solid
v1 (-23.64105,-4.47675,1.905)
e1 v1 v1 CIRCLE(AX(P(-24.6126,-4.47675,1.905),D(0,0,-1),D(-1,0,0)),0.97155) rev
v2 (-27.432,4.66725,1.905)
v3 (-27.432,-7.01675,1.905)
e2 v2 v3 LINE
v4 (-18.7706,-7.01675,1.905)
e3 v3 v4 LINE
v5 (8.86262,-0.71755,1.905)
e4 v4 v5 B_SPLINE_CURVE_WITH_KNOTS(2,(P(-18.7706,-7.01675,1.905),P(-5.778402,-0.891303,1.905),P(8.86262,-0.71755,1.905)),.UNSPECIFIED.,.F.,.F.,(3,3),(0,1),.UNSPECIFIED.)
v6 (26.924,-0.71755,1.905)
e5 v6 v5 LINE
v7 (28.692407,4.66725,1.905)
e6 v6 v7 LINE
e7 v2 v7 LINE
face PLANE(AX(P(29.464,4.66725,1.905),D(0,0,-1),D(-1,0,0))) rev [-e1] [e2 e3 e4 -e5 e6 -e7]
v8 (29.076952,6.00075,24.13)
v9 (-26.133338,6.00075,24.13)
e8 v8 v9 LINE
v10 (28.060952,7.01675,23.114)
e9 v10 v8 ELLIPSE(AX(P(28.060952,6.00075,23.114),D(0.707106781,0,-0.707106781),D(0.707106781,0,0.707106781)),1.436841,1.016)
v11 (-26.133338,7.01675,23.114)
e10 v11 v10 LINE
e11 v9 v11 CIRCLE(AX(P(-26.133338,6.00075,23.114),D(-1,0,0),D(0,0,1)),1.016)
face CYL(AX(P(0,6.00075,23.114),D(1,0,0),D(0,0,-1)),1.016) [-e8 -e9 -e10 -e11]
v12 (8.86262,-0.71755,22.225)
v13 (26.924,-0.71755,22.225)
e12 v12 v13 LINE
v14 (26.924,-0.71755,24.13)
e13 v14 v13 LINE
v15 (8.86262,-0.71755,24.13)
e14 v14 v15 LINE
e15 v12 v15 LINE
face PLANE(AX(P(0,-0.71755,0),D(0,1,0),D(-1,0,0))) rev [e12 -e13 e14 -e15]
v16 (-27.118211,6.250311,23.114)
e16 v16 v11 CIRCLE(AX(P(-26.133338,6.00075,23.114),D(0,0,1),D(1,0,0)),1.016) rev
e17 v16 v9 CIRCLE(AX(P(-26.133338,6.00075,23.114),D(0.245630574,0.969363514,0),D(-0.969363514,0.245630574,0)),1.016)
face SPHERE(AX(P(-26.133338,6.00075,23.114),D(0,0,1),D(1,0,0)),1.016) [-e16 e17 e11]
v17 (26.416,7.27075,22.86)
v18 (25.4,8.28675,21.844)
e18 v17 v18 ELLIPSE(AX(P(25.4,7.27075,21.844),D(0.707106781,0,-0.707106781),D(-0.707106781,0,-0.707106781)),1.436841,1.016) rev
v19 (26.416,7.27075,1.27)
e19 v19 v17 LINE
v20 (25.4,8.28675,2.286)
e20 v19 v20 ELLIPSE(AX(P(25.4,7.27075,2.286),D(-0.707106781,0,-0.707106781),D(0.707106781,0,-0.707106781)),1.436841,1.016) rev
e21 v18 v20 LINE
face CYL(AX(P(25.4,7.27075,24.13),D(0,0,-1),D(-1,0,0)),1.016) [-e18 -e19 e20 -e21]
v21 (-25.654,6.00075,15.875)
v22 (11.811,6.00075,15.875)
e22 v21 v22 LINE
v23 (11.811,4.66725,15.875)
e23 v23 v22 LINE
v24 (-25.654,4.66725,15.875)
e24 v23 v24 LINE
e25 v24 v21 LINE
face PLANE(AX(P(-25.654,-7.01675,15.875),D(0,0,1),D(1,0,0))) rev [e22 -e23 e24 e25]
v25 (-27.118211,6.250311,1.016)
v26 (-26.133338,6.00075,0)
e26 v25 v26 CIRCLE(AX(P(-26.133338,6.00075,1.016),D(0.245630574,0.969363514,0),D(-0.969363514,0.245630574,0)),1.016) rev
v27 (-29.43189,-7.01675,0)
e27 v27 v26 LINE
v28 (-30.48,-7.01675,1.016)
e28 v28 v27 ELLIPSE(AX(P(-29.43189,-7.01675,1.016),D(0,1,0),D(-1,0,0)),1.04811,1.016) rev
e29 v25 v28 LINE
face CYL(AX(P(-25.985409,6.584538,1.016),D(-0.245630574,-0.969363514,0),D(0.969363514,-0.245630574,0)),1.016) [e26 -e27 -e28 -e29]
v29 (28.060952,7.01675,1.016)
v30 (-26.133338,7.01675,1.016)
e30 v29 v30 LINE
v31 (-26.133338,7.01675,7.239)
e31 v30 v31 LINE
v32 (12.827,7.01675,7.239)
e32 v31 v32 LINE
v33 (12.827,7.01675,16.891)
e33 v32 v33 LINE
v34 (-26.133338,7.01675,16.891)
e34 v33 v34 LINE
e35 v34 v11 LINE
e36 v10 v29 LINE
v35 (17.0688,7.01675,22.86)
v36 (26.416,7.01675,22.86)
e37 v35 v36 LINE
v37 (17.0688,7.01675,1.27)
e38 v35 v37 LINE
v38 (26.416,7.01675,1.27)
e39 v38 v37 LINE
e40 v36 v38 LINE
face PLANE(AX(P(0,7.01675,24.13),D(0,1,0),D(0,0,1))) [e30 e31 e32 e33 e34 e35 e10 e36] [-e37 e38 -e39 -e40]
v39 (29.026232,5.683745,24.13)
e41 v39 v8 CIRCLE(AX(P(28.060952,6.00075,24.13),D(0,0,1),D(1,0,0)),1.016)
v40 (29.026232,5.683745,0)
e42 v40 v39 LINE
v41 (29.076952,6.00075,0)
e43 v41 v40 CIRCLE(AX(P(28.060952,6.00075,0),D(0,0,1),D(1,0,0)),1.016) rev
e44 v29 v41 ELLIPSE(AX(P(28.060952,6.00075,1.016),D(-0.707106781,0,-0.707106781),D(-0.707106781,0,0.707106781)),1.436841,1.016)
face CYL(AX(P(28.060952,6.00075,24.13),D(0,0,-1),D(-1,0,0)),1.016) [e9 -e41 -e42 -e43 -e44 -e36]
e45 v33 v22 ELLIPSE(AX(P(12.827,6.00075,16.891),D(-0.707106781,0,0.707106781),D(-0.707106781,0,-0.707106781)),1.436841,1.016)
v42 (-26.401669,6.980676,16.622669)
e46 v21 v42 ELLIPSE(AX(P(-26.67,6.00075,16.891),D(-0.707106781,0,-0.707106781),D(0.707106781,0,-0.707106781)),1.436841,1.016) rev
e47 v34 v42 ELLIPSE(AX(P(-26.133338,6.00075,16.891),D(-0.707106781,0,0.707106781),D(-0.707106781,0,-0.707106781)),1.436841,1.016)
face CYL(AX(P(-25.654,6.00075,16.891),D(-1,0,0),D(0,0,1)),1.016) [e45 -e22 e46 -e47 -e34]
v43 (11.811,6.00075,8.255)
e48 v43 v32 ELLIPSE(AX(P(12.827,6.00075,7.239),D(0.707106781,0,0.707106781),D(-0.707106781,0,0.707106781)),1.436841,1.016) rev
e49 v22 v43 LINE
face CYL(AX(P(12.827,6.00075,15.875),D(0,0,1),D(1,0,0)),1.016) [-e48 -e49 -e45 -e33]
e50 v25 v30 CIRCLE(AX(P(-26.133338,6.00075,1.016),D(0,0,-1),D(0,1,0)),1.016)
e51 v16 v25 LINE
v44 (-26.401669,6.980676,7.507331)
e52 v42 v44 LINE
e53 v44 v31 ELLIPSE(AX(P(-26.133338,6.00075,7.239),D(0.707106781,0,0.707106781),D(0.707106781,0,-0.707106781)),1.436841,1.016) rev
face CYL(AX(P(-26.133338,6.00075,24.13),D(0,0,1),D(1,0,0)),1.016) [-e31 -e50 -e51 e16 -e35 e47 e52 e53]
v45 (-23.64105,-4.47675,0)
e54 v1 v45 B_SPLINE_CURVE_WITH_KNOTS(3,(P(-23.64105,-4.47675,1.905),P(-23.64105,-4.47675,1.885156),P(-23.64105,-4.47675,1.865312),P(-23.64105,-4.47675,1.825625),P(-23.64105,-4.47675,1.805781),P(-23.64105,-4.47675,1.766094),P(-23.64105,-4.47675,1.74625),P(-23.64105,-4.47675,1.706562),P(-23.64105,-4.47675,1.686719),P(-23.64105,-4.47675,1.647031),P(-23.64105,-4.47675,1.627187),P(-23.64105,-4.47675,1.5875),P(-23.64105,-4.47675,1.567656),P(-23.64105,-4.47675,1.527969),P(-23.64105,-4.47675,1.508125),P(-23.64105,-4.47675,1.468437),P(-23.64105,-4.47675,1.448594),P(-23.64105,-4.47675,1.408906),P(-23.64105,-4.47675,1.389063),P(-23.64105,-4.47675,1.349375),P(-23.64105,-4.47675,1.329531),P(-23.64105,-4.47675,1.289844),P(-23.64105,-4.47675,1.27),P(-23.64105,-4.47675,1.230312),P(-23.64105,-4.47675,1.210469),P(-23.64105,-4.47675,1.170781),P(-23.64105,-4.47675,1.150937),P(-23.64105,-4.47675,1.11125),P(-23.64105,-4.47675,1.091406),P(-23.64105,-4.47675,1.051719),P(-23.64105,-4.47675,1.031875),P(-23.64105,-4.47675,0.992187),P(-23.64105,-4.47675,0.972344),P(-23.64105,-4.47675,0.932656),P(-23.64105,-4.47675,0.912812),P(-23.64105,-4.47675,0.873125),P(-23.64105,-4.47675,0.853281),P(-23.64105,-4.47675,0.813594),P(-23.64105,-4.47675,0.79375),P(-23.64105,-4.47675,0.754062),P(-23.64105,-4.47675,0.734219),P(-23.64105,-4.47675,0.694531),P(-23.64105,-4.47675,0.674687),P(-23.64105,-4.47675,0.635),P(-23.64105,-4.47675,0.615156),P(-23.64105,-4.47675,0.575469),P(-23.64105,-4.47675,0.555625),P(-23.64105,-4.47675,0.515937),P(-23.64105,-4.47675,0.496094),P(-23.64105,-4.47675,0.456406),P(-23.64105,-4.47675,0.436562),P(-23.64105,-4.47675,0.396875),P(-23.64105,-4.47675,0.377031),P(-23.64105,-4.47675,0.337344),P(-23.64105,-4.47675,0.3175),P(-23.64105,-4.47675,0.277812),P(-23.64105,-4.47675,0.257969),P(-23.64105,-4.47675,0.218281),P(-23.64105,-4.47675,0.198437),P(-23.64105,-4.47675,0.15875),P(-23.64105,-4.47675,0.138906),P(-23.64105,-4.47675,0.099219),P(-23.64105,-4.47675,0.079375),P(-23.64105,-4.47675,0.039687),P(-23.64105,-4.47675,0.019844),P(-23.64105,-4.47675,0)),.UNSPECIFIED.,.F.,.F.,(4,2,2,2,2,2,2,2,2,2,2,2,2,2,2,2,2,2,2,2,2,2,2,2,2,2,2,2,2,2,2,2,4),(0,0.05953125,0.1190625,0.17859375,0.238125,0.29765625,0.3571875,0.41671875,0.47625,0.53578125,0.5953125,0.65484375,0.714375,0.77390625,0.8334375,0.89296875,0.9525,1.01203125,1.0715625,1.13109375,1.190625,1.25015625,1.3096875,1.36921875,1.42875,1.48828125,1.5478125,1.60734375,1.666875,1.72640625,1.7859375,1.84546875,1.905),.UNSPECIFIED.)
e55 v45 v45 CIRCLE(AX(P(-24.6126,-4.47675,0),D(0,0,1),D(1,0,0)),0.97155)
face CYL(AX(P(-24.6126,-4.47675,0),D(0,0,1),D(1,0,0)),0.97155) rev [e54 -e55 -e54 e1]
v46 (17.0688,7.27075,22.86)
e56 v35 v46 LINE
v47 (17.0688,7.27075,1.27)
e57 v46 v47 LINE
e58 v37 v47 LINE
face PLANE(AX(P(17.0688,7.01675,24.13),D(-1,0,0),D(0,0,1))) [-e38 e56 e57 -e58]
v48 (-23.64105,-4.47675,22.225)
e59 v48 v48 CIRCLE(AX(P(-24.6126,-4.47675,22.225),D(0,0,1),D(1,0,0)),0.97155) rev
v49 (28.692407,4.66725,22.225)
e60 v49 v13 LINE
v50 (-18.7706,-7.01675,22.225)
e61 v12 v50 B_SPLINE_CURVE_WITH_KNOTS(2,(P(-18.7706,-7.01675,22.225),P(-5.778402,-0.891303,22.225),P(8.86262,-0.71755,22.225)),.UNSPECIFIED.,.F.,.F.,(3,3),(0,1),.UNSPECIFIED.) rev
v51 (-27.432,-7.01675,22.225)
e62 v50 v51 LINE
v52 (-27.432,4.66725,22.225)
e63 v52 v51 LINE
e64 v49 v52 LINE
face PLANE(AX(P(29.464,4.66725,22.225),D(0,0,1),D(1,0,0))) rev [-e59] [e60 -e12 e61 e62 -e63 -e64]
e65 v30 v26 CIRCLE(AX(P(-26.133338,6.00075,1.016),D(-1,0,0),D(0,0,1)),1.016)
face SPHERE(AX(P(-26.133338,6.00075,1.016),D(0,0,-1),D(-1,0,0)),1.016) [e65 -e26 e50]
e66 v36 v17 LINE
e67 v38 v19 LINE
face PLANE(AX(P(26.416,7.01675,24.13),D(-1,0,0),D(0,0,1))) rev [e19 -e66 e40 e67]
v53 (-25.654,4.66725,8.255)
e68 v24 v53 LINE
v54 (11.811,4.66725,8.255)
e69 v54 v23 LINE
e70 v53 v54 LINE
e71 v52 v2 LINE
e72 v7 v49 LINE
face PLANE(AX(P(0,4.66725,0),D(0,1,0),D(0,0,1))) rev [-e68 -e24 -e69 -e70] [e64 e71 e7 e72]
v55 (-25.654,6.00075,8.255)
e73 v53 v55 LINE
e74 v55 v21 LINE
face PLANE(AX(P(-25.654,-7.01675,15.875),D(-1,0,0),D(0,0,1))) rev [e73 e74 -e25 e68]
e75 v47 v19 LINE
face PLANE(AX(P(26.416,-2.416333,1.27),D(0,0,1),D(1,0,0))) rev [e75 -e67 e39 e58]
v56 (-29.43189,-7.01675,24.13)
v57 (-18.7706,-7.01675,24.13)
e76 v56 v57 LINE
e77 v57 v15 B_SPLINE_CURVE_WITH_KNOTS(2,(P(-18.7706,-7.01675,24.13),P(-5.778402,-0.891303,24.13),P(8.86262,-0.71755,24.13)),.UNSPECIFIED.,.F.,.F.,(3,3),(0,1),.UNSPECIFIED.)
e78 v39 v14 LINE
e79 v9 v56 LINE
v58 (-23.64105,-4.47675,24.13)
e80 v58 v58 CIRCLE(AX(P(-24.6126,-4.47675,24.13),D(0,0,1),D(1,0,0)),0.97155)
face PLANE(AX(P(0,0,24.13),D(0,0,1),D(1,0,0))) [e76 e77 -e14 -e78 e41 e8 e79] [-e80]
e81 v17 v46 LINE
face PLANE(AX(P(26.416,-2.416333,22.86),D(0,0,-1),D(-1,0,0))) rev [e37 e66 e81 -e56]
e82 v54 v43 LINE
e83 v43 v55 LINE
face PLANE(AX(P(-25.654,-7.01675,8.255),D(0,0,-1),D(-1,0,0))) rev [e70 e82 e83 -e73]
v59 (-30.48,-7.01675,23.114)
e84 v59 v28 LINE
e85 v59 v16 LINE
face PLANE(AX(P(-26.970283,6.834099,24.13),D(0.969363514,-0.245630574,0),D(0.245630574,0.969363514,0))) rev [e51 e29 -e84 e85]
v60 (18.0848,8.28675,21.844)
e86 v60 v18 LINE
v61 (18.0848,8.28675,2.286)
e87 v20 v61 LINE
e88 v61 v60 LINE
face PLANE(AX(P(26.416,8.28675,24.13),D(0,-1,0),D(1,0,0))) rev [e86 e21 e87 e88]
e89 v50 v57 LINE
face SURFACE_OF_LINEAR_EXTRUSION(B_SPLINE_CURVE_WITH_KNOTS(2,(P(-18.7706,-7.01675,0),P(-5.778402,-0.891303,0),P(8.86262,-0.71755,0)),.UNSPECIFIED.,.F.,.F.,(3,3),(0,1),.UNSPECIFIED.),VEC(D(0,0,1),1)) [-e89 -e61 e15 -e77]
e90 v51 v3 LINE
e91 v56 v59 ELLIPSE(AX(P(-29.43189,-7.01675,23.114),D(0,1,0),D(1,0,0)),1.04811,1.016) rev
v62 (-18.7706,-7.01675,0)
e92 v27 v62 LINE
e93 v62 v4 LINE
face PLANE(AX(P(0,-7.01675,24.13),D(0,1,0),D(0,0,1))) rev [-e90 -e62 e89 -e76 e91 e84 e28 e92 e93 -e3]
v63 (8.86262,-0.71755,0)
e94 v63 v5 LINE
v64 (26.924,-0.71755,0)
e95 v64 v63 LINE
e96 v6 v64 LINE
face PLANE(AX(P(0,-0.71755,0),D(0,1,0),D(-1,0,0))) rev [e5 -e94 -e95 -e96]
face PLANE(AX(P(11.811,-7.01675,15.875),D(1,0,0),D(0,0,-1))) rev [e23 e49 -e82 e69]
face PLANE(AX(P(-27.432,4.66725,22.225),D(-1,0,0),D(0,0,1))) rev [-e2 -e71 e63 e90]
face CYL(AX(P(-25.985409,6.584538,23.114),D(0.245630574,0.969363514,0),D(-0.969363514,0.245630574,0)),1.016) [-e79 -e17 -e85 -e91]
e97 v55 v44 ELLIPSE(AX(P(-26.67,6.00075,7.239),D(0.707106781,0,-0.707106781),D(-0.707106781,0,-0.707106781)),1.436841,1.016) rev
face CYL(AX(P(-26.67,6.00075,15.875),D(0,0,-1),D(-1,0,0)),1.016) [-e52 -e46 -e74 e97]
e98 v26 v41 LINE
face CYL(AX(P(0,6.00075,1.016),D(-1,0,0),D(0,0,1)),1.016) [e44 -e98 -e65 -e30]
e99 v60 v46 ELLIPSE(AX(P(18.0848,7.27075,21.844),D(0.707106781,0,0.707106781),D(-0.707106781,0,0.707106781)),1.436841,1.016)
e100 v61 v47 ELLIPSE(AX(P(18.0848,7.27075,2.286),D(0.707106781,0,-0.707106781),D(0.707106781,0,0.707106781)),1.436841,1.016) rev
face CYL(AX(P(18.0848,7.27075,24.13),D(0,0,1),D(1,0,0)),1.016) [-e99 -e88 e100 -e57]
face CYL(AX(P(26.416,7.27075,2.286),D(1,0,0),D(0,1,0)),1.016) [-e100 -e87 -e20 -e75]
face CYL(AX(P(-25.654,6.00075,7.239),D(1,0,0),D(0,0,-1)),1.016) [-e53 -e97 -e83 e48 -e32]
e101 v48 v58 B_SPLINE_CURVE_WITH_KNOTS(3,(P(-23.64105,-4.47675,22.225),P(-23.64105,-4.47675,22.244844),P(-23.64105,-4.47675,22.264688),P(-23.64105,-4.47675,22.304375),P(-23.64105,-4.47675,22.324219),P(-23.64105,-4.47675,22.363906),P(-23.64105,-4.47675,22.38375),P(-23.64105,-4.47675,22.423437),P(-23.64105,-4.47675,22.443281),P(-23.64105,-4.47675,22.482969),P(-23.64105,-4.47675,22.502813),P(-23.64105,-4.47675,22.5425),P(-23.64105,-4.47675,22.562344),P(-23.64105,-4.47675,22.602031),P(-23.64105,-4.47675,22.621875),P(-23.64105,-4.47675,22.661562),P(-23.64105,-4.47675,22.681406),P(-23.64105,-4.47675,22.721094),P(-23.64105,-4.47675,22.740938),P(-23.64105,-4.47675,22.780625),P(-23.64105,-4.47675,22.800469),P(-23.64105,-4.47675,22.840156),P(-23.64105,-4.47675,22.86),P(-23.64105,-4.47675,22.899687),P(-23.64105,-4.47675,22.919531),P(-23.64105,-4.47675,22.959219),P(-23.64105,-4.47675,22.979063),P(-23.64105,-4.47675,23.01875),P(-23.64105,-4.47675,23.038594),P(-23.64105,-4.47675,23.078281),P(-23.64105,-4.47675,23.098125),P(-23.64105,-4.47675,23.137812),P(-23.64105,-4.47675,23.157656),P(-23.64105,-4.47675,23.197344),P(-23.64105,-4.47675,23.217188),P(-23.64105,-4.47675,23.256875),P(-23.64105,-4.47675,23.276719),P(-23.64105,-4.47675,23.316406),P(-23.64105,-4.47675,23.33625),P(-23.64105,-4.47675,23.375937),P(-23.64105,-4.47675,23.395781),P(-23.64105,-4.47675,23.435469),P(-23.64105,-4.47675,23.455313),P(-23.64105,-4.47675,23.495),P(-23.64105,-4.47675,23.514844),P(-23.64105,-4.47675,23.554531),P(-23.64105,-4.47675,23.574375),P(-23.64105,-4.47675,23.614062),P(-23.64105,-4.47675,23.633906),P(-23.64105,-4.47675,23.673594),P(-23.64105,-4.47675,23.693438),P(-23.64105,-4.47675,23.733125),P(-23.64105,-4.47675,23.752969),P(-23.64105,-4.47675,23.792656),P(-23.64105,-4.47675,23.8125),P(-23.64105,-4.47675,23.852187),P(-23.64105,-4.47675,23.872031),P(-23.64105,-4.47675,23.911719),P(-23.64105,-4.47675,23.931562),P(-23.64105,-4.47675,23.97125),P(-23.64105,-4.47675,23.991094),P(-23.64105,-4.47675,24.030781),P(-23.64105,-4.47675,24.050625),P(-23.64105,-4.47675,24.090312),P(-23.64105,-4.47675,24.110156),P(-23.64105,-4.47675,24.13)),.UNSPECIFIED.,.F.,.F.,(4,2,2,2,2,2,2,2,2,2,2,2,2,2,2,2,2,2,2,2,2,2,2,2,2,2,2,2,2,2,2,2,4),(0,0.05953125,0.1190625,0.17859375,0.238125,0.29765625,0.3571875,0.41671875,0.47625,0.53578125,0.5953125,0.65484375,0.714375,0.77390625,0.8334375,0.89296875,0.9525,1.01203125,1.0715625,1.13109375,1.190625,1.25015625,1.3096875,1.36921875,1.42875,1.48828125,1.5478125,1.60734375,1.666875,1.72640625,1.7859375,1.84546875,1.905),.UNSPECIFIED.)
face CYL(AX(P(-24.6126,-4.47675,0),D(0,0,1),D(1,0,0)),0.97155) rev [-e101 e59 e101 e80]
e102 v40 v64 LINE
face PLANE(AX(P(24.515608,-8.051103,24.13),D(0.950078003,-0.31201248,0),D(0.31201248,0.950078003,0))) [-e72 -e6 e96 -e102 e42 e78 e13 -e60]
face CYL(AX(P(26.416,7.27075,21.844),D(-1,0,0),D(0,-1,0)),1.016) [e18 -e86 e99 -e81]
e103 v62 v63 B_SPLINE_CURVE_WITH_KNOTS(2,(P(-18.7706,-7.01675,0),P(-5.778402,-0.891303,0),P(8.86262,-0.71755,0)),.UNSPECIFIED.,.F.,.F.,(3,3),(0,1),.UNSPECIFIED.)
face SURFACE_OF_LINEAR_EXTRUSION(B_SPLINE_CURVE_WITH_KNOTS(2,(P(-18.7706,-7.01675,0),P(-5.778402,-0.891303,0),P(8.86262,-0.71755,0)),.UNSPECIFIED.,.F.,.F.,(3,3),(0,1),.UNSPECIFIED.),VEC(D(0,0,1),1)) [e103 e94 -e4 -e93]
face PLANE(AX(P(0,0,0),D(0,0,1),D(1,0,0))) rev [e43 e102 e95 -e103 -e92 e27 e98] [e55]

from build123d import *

# Parameters (mm, degrees)
SKETCH5_W           = 53.848
SKETCH5_H           = 14.0335
SKETCH5_W_2         = 9.3472
SKETCH5_H_2         = 1.27
BOSS_EXTRUDE2_DEPTH = 24.13
SKETCH7_R           = 0.97155
CUT_EXTRUDE3_DEPTH  = 40.748679545
SKETCH8_W           = 9.3472
SKETCH8_H           = 1.27
CUT_EXTRUDE4_DEPTH  = 1.27
SKETCH9_W           = 37.465
SKETCH9_H           = 7.62
CUT_EXTRUDE5_DEPTH  = 42.33069605
SKETCH10_W          = 56.896
SKETCH10_H          = 20.32
CUT_EXTRUDE6_DEPTH  = 11.684
FILLET1_R           = 1.016
FILLET5_R           = 1.016


with BuildPart() as part:
    # Sketch5 → Boss-Extrude2 (new body)
    with BuildSketch(Plane.XY):
        Rectangle(SKETCH5_W, SKETCH5_H)
        Polygon((26.924, 7.01675), (26.924, -0.71755), (29.464, 7.01675), align=None)
        Polygon((-26.924, 7.01675), (-30.48, -7.01675), (-26.924, -7.01675), align=None)
        with Locations((21.7424, 7.65175)):
            Rectangle(SKETCH5_W_2, SKETCH5_H_2)
    extrude(amount=BOSS_EXTRUDE2_DEPTH)

    # Sketch7 → Cut-Extrude3 (cut, through all)
    with BuildSketch(Plane.XY.offset(24.13)):
        with BuildLine():
            Line((26.924, -7.01675), (26.924, -0.71755))
            Line((26.924, -0.71755), (8.862620223, -0.71755))
            add(Edge.make_bspline(
                [(-18.7706, -7.01675), (-5.778401918, -0.891302623), (8.862620223, -0.71755)],
                knots=[0, 0, 0, 1, 1, 1], degree=2))
            Line((-18.7706, -7.01675), (26.924, -7.01675))
        make_face()
        with Locations((-24.6126, -4.47675)):
            Circle(SKETCH7_R)
    extrude(amount=-CUT_EXTRUDE3_DEPTH, mode=Mode.SUBTRACT)

    # Sketch8 → Cut-Extrude4 (cut)
    with BuildSketch(Plane(origin=(0, 8.28675, 0), x_dir=(1, 0, 0), z_dir=(0, 1, 0))):
        with Locations((21.7424, -0.635)):
            Rectangle(SKETCH8_W, SKETCH8_H)
        with Locations((21.7424, -23.495)):
            Rectangle(SKETCH8_W, SKETCH8_H)
    extrude(amount=-CUT_EXTRUDE4_DEPTH, mode=Mode.SUBTRACT)

    # Sketch9 → Cut-Extrude5 (cut, through all)
    with BuildSketch(Plane(origin=(0, 7.01675, 0), x_dir=(1, 0, 0), z_dir=(0, 1, 0))):
        with Locations((-6.9215, -12.065)):
            Rectangle(SKETCH9_W, SKETCH9_H)
    extrude(amount=-CUT_EXTRUDE5_DEPTH, mode=Mode.SUBTRACT)

    # Sketch10 → Cut-Extrude6 (cut)
    with BuildSketch(Plane.XZ.offset(7.01675)):
        with Locations((1.016, 12.065)):
            Rectangle(SKETCH10_W, SKETCH10_H)
    extrude(amount=-CUT_EXTRUDE6_DEPTH, mode=Mode.SUBTRACT)

    # Fillet1
    # the kernel refuses this fillet: 1.016 mm, written as the material it takes off along each edge
    with BuildSketch(Plane(origin=(-26.133337543, 6.00075, 1.016), x_dir=(-0.9693635135141576, 0.2456305735601486, 0), z_dir=(0, 0, -1))) as fillet1_piece_1_section:
        Polygon((0, 0), (FILLET1_R, 0), (FILLET1_R, FILLET1_R * 0.778211079665), (FILLET1_R * 0.24563057356, FILLET1_R * 0.969363513514), align=None)
    fillet1_piece_1 = extrude(amount=FILLET1_R, mode=Mode.PRIVATE)
    fillet1_piece_1 = fillet1_piece_1 - Plane(origin=(-26.133337543, 6.00075, 1.016), x_dir=(0.6141536560339975, -0.7891864714882498, 0), z_dir=(0, 0, -1)) * Sphere(FILLET1_R, mode=Mode.PRIVATE)
    add(fillet1_piece_1, mode=Mode.SUBTRACT)
    with BuildSketch(Plane(origin=(-26.133337543, 6.00075, 23.114), x_dir=(-0.9693635135141576, 0.2456305735601486, 0), z_dir=(0, 0, 1))) as fillet1_piece_2_section:
        Polygon((0, 0), (FILLET1_R, 0), (FILLET1_R, -FILLET1_R * 0.778211079665), (FILLET1_R * 0.24563057356, -FILLET1_R * 0.969363513514), align=None)
    fillet1_piece_2 = extrude(amount=FILLET1_R, mode=Mode.PRIVATE)
    fillet1_piece_2 = fillet1_piece_2 - Plane(origin=(-26.133337543, 6.00075, 23.114), x_dir=(0.6141536560339975, -0.7891864714882498, 0), z_dir=(0, 0, 1)) * Sphere(FILLET1_R, mode=Mode.PRIVATE)
    add(fillet1_piece_2, mode=Mode.SUBTRACT)
    with BuildSketch(Plane(origin=(-26.924, 7.01675, 1.016), x_dir=(-0.24563057356014745, -0.969363513514158, 0), z_dir=(0, 0, 1))) as fillet1_piece_3:
        with BuildLine():
            CenterArc((FILLET1_R * 0.778211079665, FILLET1_R), FILLET1_R, 194.219101718, 75.780898282)
            Line((-FILLET1_R * 0.191152433849, FILLET1_R * 0.75436942644), (0, 0))
            Line((0, 0), (FILLET1_R * 0.778211079665, 0))
        make_face()
    extrude(amount=22.098, mode=Mode.SUBTRACT)
    with BuildSketch(Plane(origin=(29.464, 7.01675, -3.507619048), x_dir=(-0.312012480499221, -0.9500780031201245, 0), z_dir=(0, 0, 1))) as fillet1_piece_4:
        with BuildLine():
            CenterArc((FILLET1_R * 1.38095238095, -FILLET1_R), FILLET1_R, 90, 108.180553842)
            Line((FILLET1_R * 0.430874377832, -FILLET1_R * 1.3120124805), (0, 0))
            Line((0, 0), (FILLET1_R * 1.38095238095, 0))
        make_face()
    extrude(amount=31.145238095, mode=Mode.SUBTRACT)
    with BuildSketch(Plane(origin=(32.004, 7.01675, 24.13), x_dir=(0, -1, 0), z_dir=(-1, 0, 0)), Plane(origin=(-26.133337543, 7.01675, 0), x_dir=(0, -1, 0), z_dir=(1, 0, 0))) as fillet1_piece_5:
        with BuildLine():
            CenterArc((FILLET1_R, -FILLET1_R), FILLET1_R, 90, 90)
            Line((0, -FILLET1_R), (0, 0))
            Line((0, 0), (FILLET1_R, 0))
        make_face()
    extrude(amount=58.137337543, mode=Mode.SUBTRACT)
    with BuildSketch(Plane(origin=(-27.118210873, 6.250310663, 24.13), x_dir=(0.9693635135141576, -0.24563057356014859, -3.4967654318902577e-15), z_dir=(-0.2456305735601486, -0.9693635135141576, 0)), Plane(origin=(-27.118210873, 6.250310663, 0), x_dir=(0, 0, 1), z_dir=(-0.2456305735601486, -0.9693635135141576, 0))) as fillet1_piece_6:
        with BuildLine():
            CenterArc((FILLET1_R, -FILLET1_R), FILLET1_R, 90, 90)
            Line((0, -FILLET1_R), (0, 0))
            Line((0, 0), (FILLET1_R, 0))
        make_face()
    extrude(amount=16.22636273, mode=Mode.SUBTRACT)
    with BuildSketch(Plane(origin=(11.811, 7.01675, 15.875), x_dir=(1, 0, 0), z_dir=(0, 0, -1)), Plane(origin=(-25.654, 7.01675, 8.255), x_dir=(-1, 0, 0), z_dir=(0, 0, 1))) as fillet1_piece_7:
        with BuildLine():
            CenterArc((FILLET1_R, FILLET1_R), FILLET1_R, 180, 90)
            Line((0, FILLET1_R), (0, 0))
            Line((0, 0), (FILLET1_R, 0))
        make_face()
    extrude(amount=7.62, mode=Mode.SUBTRACT)
    with BuildSketch(Plane(origin=(11.811, 7.01675, 8.255), x_dir=(0, 0, -1), z_dir=(-1, 0, 0)), Plane(origin=(-25.654, 7.01675, 15.875), x_dir=(0, 0, 1), z_dir=(1, 0, 0))) as fillet1_piece_8:
        with BuildLine():
            CenterArc((FILLET1_R, FILLET1_R), FILLET1_R, 180, 90)
            Line((0, FILLET1_R), (0, 0))
            Line((0, 0), (FILLET1_R, 0))
        make_face()
    extrude(amount=37.465, mode=Mode.SUBTRACT)
    with BuildSketch(Plane(origin=(11.811, 7.01675, 18.415), x_dir=(1, 0, 0), z_dir=(0, 0, -1))) as fillet1_piece_9a_section:
        with BuildLine():
            CenterArc((FILLET1_R, FILLET1_R), FILLET1_R, 180, 90)
            Line((0, FILLET1_R), (0, 0))
            Line((0, 0), (FILLET1_R, 0))
        make_face()
    fillet1_piece_9a = extrude(amount=10.16, mode=Mode.PRIVATE)
    fillet1_piece_9a = split(fillet1_piece_9a, bisect_by=Plane(origin=(12.041017436, 6.786732564, 15.875), z_dir=(0, 0, 1)), keep=Keep.TOP, mode=Mode.PRIVATE)
    with BuildSketch(Plane(origin=(-25.654, 7.01675, 15.875), x_dir=(0, 0, 1), z_dir=(1, 0, 0))) as fillet1_piece_9b_section:
        with BuildLine():
            CenterArc((FILLET1_R, FILLET1_R), FILLET1_R, 180, 90)
            Line((0, FILLET1_R), (0, 0))
            Line((0, 0), (FILLET1_R, 0))
        make_face()
    fillet1_piece_9b = extrude(amount=40.005, mode=Mode.PRIVATE)
    fillet1_piece_9b = split(fillet1_piece_9b, bisect_by=Plane(origin=(11.811, 6.786732564, 16.105017436), z_dir=(1, 0, 0)), keep=Keep.TOP, mode=Mode.PRIVATE)
    fillet1_piece_9 = fillet1_piece_9a & fillet1_piece_9b
    add(fillet1_piece_9, mode=Mode.SUBTRACT)
    with BuildSketch(Plane(origin=(14.351, 7.01675, 8.255), x_dir=(0, 0, -1), z_dir=(-1, 0, 0))) as fillet1_piece_10a_section:
        with BuildLine():
            CenterArc((FILLET1_R, FILLET1_R), FILLET1_R, 180, 90)
            Line((0, FILLET1_R), (0, 0))
            Line((0, 0), (FILLET1_R, 0))
        make_face()
    fillet1_piece_10a = extrude(amount=40.005, mode=Mode.PRIVATE)
    fillet1_piece_10a = split(fillet1_piece_10a, bisect_by=Plane(origin=(11.811, 6.786732564, 8.024982564), z_dir=(1, 0, 0)), keep=Keep.TOP, mode=Mode.PRIVATE)
    with BuildSketch(Plane(origin=(11.811, 7.01675, 15.875), x_dir=(1, 0, 0), z_dir=(0, 0, -1))) as fillet1_piece_10b_section:
        with BuildLine():
            CenterArc((FILLET1_R, FILLET1_R), FILLET1_R, 180, 90)
            Line((0, FILLET1_R), (0, 0))
            Line((0, 0), (FILLET1_R, 0))
        make_face()
    fillet1_piece_10b = extrude(amount=10.16, mode=Mode.PRIVATE)
    fillet1_piece_10b = split(fillet1_piece_10b, bisect_by=Plane(origin=(12.041017436, 6.786732564, 8.255), z_dir=(0, 0, -1)), keep=Keep.TOP, mode=Mode.PRIVATE)
    fillet1_piece_10 = fillet1_piece_10a & fillet1_piece_10b
    add(fillet1_piece_10, mode=Mode.SUBTRACT)
    with BuildSketch(Plane(origin=(-25.654, 7.01675, 5.715), x_dir=(-1, 0, 0), z_dir=(0, 0, 1))) as fillet1_piece_11a_section:
        with BuildLine():
            CenterArc((FILLET1_R, FILLET1_R), FILLET1_R, 180, 90)
            Line((0, FILLET1_R), (0, 0))
            Line((0, 0), (FILLET1_R, 0))
        make_face()
    fillet1_piece_11a = extrude(amount=10.16, mode=Mode.PRIVATE)
    fillet1_piece_11a = split(fillet1_piece_11a, bisect_by=Plane(origin=(-25.884017436, 6.786732564, 8.255), z_dir=(0, 0, -1)), keep=Keep.TOP, mode=Mode.PRIVATE)
    with BuildSketch(Plane(origin=(11.811, 7.01675, 8.255), x_dir=(0, 0, -1), z_dir=(-1, 0, 0))) as fillet1_piece_11b_section:
        with BuildLine():
            CenterArc((FILLET1_R, FILLET1_R), FILLET1_R, 180, 90)
            Line((0, FILLET1_R), (0, 0))
            Line((0, 0), (FILLET1_R, 0))
        make_face()
    fillet1_piece_11b = extrude(amount=40.005, mode=Mode.PRIVATE)
    fillet1_piece_11b = split(fillet1_piece_11b, bisect_by=Plane(origin=(-25.654, 6.786732564, 8.024982564), z_dir=(-1, 0, 0)), keep=Keep.TOP, mode=Mode.PRIVATE)
    fillet1_piece_11 = fillet1_piece_11a & fillet1_piece_11b
    add(fillet1_piece_11, mode=Mode.SUBTRACT)
    with BuildSketch(Plane(origin=(-25.654, 7.01675, 8.255), x_dir=(-1, 0, 0), z_dir=(0, 0, 1))) as fillet1_piece_12a_section:
        with BuildLine():
            CenterArc((FILLET1_R, FILLET1_R), FILLET1_R, 180, 90)
            Line((0, FILLET1_R), (0, 0))
            Line((0, 0), (FILLET1_R, 0))
        make_face()
    fillet1_piece_12a = extrude(amount=10.16, mode=Mode.PRIVATE)
    fillet1_piece_12a = split(fillet1_piece_12a, bisect_by=Plane(origin=(-25.884017436, 6.786732564, 15.875), z_dir=(0, 0, 1)), keep=Keep.TOP, mode=Mode.PRIVATE)
    with BuildSketch(Plane(origin=(-28.194, 7.01675, 15.875), x_dir=(0, 0, 1), z_dir=(1, 0, 0))) as fillet1_piece_12b_section:
        with BuildLine():
            CenterArc((FILLET1_R, FILLET1_R), FILLET1_R, 180, 90)
            Line((0, FILLET1_R), (0, 0))
            Line((0, 0), (FILLET1_R, 0))
        make_face()
    fillet1_piece_12b = extrude(amount=40.005, mode=Mode.PRIVATE)
    fillet1_piece_12b = split(fillet1_piece_12b, bisect_by=Plane(origin=(-25.654, 6.786732564, 16.105017436), z_dir=(-1, 0, 0)), keep=Keep.TOP, mode=Mode.PRIVATE)
    fillet1_piece_12 = fillet1_piece_12a & fillet1_piece_12b
    add(fillet1_piece_12, mode=Mode.SUBTRACT)

    # Fillet5
    fillet5_edges = [part.edges().sort_by_distance(p)[0] for p in [
        (26.416, 8.28675, 12.065),
        (17.0688, 8.28675, 12.065),
        (21.7424, 8.28675, 1.27),
        (21.7424, 8.28675, 22.86),
    ]]
    fillet(fillet5_edges, radius=FILLET5_R)


solid = part.part
